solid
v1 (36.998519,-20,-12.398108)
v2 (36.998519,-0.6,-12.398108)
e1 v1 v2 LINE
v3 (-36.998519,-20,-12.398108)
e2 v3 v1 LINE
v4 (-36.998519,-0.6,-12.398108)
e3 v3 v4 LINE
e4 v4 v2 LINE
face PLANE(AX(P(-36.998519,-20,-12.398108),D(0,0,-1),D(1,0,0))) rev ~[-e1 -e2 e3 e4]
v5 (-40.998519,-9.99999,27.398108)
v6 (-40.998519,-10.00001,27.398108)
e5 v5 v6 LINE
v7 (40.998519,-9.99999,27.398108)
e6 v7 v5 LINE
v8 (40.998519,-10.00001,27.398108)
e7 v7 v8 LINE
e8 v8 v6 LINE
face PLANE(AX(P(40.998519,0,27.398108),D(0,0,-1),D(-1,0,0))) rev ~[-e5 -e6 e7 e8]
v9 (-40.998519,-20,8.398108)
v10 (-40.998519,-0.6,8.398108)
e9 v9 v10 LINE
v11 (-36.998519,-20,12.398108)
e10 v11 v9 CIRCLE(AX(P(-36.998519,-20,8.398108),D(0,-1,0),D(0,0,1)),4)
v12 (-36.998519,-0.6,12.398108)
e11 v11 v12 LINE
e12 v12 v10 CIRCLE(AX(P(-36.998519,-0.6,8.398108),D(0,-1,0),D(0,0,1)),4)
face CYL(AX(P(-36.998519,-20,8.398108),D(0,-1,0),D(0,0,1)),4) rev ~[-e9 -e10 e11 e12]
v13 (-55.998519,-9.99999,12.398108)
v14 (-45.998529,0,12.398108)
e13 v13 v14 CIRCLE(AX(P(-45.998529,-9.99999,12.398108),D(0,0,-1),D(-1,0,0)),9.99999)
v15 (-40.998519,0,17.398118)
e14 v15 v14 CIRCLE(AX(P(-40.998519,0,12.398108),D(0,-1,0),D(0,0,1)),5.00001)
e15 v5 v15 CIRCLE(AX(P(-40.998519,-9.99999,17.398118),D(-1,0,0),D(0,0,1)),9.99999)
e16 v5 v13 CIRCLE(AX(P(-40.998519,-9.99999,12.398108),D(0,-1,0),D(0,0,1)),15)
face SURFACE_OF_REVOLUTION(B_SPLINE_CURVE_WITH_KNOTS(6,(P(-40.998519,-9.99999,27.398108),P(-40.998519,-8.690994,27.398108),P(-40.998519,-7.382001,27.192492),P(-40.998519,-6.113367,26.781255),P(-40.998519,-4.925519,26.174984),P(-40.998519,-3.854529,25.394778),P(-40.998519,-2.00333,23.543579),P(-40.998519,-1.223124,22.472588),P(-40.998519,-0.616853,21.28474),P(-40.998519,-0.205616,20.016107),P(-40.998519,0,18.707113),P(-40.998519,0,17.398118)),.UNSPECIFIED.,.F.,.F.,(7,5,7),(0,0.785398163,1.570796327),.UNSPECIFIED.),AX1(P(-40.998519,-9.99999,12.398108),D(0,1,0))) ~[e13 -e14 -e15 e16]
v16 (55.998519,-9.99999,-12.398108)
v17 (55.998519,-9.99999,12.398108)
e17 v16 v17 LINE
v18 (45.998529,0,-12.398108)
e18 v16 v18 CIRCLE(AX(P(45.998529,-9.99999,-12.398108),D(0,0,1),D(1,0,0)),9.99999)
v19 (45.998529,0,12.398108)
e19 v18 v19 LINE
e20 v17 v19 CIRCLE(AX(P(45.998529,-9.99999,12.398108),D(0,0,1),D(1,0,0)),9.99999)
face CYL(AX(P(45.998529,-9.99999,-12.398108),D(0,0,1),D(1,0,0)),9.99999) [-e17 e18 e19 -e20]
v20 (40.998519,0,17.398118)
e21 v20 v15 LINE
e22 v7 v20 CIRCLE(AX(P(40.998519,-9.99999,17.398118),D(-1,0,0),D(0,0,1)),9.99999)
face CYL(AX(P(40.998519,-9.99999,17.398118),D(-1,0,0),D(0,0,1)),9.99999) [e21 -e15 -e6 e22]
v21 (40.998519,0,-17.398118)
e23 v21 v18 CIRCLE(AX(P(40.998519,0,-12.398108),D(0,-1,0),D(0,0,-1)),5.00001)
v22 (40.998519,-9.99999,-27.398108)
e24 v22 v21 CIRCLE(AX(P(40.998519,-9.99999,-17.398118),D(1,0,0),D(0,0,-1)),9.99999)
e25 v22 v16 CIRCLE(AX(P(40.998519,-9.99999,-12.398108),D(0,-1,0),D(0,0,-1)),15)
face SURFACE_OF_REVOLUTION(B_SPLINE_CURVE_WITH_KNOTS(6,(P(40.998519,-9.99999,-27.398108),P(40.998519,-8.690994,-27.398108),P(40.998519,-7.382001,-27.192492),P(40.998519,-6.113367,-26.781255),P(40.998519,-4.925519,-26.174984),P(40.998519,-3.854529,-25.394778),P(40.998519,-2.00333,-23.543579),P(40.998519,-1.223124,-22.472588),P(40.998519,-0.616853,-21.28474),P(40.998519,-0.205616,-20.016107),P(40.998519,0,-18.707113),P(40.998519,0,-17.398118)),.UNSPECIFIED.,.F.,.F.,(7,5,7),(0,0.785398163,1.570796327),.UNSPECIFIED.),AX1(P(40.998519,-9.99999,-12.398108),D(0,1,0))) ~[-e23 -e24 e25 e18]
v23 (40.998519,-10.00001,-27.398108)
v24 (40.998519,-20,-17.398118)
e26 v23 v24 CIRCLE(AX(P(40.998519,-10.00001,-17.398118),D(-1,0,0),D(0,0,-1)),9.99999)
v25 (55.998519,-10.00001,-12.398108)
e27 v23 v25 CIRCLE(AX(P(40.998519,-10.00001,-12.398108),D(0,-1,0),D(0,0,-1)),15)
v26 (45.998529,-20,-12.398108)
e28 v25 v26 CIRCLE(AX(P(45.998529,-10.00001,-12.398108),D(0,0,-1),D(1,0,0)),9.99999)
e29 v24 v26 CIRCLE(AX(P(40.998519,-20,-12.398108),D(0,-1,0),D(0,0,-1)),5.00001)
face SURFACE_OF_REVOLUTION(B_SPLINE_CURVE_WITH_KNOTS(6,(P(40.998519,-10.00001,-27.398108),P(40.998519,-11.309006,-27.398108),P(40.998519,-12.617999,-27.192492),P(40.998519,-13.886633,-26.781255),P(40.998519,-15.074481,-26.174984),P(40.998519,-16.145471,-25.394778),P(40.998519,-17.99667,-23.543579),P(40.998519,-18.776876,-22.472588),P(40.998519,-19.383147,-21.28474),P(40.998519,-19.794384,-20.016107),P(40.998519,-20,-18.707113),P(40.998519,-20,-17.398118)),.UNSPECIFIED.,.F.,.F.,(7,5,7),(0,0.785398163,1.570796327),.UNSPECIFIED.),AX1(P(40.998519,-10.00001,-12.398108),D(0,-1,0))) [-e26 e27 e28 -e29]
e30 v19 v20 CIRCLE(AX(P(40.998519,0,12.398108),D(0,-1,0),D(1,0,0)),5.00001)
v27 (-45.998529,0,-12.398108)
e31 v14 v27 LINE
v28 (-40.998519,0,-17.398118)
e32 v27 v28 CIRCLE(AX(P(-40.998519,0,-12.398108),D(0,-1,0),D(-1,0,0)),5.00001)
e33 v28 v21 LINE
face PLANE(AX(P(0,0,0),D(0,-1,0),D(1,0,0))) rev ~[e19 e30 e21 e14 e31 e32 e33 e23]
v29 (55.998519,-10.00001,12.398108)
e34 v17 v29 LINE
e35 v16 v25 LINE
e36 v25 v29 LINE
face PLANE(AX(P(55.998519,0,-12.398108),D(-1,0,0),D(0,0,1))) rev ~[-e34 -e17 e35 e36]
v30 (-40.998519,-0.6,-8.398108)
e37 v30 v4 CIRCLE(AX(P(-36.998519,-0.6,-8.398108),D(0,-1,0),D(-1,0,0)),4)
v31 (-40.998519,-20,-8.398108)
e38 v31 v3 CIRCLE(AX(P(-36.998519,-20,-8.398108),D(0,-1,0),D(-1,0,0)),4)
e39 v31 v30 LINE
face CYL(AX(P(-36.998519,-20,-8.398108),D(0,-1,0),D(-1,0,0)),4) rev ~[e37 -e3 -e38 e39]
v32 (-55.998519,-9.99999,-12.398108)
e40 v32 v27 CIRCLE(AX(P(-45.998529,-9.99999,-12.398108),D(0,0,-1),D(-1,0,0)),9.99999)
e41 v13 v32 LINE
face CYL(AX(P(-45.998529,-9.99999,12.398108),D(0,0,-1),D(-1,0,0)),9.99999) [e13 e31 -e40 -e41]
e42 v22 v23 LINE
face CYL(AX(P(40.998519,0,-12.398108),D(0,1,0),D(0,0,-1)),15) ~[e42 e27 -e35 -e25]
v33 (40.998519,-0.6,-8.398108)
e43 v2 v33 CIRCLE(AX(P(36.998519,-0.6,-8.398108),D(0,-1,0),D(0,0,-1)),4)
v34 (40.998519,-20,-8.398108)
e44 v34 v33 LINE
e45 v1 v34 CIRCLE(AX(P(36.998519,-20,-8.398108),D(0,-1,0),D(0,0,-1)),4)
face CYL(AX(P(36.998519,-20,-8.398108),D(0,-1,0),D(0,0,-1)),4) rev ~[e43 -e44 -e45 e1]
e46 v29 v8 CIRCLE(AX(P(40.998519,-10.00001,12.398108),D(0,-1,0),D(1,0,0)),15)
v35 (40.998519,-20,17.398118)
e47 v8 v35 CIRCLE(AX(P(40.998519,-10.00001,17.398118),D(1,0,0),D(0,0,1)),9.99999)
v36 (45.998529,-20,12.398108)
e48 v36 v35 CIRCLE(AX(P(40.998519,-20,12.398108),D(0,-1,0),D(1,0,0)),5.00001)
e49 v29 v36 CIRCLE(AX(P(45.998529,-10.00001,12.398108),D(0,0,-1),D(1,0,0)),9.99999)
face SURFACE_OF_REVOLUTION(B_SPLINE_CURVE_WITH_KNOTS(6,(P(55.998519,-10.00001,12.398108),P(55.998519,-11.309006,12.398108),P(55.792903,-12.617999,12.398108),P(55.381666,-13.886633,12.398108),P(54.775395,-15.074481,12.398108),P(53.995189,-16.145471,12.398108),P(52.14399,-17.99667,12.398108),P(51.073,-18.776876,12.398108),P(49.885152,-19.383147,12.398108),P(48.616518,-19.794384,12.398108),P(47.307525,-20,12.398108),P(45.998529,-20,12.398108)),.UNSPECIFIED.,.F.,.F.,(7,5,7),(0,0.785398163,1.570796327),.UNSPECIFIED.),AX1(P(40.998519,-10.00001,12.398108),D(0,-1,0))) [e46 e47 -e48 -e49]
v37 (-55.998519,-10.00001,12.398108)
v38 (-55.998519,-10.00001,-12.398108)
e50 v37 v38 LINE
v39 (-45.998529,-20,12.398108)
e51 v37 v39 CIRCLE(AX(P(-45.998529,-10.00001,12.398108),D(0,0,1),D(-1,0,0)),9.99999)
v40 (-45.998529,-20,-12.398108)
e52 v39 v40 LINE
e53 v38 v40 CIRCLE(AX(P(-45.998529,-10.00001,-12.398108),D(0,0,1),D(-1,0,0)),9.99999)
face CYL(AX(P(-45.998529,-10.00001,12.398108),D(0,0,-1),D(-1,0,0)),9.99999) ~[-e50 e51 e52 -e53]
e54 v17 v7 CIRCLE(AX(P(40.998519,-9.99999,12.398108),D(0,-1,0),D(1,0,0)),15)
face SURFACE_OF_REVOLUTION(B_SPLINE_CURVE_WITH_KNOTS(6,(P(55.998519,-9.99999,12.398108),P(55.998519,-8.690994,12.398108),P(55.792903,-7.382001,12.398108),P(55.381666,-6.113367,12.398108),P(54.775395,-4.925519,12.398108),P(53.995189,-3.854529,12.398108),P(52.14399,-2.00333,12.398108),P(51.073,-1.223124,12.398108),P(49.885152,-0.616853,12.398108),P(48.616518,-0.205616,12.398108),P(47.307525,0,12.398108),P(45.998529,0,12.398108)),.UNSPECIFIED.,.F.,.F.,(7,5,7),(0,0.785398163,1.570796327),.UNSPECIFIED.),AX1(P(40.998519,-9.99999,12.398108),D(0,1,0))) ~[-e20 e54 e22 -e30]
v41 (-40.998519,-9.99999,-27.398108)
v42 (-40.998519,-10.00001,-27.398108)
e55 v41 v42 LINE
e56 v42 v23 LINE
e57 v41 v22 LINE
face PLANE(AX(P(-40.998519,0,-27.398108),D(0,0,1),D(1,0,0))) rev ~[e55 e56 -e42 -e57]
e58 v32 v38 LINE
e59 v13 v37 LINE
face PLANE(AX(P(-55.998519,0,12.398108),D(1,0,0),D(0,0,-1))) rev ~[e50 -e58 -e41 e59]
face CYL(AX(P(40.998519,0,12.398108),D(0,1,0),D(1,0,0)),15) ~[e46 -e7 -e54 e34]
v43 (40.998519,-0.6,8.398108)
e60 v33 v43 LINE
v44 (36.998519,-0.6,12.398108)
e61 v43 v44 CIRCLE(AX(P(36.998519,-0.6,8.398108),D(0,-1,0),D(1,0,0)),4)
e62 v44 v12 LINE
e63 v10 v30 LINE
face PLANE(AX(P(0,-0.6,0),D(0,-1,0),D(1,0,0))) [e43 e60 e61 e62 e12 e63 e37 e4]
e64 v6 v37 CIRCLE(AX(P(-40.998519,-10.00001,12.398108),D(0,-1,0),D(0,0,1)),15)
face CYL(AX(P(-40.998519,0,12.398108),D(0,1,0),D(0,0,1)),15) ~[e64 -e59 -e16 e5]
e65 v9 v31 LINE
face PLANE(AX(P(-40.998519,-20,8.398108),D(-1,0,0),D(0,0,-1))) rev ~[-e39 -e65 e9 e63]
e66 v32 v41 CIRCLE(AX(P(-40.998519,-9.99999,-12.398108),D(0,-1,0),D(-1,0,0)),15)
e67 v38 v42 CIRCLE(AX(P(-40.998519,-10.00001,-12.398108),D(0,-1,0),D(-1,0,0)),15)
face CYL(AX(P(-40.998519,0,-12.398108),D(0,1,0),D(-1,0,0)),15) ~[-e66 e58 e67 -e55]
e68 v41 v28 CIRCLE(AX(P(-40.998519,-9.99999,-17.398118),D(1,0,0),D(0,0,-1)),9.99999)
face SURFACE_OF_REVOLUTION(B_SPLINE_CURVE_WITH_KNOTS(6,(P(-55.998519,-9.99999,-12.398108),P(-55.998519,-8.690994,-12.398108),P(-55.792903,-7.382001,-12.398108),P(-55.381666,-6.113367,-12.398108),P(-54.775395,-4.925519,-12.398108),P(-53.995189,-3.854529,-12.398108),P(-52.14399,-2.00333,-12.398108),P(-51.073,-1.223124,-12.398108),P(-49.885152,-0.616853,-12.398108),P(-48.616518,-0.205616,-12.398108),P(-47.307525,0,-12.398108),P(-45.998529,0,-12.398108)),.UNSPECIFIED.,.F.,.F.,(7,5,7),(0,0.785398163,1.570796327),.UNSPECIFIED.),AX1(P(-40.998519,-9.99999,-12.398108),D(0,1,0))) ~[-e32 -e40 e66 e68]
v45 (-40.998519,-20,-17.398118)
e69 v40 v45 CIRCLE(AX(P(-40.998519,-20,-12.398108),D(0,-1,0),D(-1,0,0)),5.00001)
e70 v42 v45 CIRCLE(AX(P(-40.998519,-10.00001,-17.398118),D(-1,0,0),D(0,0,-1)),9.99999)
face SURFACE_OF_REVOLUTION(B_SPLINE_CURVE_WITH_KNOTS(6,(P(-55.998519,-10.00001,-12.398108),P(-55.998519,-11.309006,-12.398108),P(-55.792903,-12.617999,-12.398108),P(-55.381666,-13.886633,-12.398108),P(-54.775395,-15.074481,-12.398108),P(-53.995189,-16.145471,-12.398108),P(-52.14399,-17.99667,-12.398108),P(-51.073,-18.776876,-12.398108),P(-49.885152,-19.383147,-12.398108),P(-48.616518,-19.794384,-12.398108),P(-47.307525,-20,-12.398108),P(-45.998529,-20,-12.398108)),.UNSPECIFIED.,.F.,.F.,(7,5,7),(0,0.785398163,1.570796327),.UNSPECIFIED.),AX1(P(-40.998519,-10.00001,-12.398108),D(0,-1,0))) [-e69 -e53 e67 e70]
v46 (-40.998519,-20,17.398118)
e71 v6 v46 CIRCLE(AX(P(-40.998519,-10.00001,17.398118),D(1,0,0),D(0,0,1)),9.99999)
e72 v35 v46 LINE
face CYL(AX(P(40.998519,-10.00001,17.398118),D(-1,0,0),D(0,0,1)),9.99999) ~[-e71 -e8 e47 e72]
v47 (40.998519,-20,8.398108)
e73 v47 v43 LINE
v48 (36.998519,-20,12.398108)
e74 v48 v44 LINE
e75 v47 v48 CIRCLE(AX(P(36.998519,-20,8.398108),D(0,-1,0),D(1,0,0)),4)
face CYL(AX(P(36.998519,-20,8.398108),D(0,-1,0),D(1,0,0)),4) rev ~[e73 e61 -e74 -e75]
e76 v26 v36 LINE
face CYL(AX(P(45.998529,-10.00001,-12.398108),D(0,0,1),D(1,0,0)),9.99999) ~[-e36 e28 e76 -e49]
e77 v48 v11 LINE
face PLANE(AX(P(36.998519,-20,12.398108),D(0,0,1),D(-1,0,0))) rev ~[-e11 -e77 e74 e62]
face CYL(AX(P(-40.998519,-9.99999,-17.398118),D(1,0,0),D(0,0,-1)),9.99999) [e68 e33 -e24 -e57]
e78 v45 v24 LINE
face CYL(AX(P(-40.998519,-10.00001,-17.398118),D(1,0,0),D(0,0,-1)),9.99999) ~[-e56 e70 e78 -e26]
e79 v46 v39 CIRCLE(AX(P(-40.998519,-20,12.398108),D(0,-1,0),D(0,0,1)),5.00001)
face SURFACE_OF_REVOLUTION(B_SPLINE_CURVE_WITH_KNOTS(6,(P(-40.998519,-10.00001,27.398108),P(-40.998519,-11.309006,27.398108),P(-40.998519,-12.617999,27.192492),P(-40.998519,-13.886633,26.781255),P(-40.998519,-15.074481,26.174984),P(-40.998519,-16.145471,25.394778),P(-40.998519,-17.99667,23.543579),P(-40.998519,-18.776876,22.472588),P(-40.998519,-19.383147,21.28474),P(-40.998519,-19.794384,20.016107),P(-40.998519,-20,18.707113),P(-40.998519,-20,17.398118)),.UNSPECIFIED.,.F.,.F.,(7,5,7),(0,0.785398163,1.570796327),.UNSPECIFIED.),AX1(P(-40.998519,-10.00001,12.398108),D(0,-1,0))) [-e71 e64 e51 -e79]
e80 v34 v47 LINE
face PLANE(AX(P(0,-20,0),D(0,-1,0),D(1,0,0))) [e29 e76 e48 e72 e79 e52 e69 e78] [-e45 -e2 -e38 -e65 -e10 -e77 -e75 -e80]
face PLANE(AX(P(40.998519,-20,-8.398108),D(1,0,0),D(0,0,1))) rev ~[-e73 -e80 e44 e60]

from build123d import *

# Parameters (mm, degrees)
F1_DEPTH = 20
F2_R     = 9.99999
F4_DEPTH = 19.4


# Not quite as in the source:
# - a fillet or chamfer is up to 0.001 mm smaller than in the source, because OpenCascade refuses the exact size


with BuildPart() as f1:
    # F0 (on Front) → F1 (new body)
    with BuildSketch(Plane.XZ):
        with BuildLine():
            ThreePointArc((55.998519063, 12.3981075734), (51.6051207808, 23.0047092912), (40.998519063, 27.3981075734))
            Line((40.998519063, 27.3981075734), (-40.998519063, 27.3981075734))
            ThreePointArc((-40.998519063, 27.3981075734), (-51.6051207808, 23.0047092912), (-55.998519063, 12.3981075734))
            Line((-55.998519063, 12.3981075734), (-55.998519063, -12.3981075734))
            ThreePointArc((-55.998519063, -12.3981075734), (-51.6051207808, -23.0047092912), (-40.998519063, -27.3981075734))
            Line((-40.998519063, -27.3981075734), (40.998519063, -27.3981075734))
            ThreePointArc((40.998519063, -27.3981075734), (51.6051207808, -23.0047092912), (55.998519063, -12.3981075734))
            Line((55.998519063, -12.3981075734), (55.998519063, 12.3981075734))
        make_face()
    extrude(amount=F1_DEPTH)

    # F2 (radius 10 in the source; OpenCascade refuses exactly that, so slightly less here)
    f2_edges = [f1.edges().sort_by_distance(p)[0] for p in [
        (55.998519, -20, 0),
        (51.605121, -20, 23.004709),
        (0, -20, 27.398108),
        (-51.605121, -20, 23.004709),
        (-55.998519, -20, 0),
        (-51.605121, -20, -23.004709),
        (0, -20, -27.398108),
        (51.605121, -20, -23.004709),
        (0, 0, 27.398108),
    ]]
    fillet(f2_edges, radius=F2_R)

    # F3 (on face) → F4 (cut)
    with BuildSketch(Plane.XZ.offset(20)):
        with BuildLine():
            ThreePointArc((-40.998519063, -8.3981075734), (-39.8269461877, -11.2265346981), (-36.998519063, -12.3981075734))
            Line((-36.998519063, -12.3981075734), (36.998519063, -12.3981075734))
            ThreePointArc((36.998519063, -12.3981075734), (39.8269461877, -11.2265346981), (40.998519063, -8.3981075734))
            Line((40.998519063, -8.3981075734), (40.998519063, 8.3981075734))
            ThreePointArc((40.998519063, 8.3981075734), (39.8269461877, 11.2265346981), (36.998519063, 12.3981075734))
            Line((36.998519063, 12.3981075734), (-36.998519063, 12.3981075734))
            ThreePointArc((-36.998519063, 12.3981075734), (-39.8269461877, 11.2265346981), (-40.998519063, 8.3981075734))
            Line((-40.998519063, 8.3981075734), (-40.998519063, -8.3981075734))
        make_face()
    extrude(amount=-F4_DEPTH, mode=Mode.SUBTRACT)


solid = f1.part
